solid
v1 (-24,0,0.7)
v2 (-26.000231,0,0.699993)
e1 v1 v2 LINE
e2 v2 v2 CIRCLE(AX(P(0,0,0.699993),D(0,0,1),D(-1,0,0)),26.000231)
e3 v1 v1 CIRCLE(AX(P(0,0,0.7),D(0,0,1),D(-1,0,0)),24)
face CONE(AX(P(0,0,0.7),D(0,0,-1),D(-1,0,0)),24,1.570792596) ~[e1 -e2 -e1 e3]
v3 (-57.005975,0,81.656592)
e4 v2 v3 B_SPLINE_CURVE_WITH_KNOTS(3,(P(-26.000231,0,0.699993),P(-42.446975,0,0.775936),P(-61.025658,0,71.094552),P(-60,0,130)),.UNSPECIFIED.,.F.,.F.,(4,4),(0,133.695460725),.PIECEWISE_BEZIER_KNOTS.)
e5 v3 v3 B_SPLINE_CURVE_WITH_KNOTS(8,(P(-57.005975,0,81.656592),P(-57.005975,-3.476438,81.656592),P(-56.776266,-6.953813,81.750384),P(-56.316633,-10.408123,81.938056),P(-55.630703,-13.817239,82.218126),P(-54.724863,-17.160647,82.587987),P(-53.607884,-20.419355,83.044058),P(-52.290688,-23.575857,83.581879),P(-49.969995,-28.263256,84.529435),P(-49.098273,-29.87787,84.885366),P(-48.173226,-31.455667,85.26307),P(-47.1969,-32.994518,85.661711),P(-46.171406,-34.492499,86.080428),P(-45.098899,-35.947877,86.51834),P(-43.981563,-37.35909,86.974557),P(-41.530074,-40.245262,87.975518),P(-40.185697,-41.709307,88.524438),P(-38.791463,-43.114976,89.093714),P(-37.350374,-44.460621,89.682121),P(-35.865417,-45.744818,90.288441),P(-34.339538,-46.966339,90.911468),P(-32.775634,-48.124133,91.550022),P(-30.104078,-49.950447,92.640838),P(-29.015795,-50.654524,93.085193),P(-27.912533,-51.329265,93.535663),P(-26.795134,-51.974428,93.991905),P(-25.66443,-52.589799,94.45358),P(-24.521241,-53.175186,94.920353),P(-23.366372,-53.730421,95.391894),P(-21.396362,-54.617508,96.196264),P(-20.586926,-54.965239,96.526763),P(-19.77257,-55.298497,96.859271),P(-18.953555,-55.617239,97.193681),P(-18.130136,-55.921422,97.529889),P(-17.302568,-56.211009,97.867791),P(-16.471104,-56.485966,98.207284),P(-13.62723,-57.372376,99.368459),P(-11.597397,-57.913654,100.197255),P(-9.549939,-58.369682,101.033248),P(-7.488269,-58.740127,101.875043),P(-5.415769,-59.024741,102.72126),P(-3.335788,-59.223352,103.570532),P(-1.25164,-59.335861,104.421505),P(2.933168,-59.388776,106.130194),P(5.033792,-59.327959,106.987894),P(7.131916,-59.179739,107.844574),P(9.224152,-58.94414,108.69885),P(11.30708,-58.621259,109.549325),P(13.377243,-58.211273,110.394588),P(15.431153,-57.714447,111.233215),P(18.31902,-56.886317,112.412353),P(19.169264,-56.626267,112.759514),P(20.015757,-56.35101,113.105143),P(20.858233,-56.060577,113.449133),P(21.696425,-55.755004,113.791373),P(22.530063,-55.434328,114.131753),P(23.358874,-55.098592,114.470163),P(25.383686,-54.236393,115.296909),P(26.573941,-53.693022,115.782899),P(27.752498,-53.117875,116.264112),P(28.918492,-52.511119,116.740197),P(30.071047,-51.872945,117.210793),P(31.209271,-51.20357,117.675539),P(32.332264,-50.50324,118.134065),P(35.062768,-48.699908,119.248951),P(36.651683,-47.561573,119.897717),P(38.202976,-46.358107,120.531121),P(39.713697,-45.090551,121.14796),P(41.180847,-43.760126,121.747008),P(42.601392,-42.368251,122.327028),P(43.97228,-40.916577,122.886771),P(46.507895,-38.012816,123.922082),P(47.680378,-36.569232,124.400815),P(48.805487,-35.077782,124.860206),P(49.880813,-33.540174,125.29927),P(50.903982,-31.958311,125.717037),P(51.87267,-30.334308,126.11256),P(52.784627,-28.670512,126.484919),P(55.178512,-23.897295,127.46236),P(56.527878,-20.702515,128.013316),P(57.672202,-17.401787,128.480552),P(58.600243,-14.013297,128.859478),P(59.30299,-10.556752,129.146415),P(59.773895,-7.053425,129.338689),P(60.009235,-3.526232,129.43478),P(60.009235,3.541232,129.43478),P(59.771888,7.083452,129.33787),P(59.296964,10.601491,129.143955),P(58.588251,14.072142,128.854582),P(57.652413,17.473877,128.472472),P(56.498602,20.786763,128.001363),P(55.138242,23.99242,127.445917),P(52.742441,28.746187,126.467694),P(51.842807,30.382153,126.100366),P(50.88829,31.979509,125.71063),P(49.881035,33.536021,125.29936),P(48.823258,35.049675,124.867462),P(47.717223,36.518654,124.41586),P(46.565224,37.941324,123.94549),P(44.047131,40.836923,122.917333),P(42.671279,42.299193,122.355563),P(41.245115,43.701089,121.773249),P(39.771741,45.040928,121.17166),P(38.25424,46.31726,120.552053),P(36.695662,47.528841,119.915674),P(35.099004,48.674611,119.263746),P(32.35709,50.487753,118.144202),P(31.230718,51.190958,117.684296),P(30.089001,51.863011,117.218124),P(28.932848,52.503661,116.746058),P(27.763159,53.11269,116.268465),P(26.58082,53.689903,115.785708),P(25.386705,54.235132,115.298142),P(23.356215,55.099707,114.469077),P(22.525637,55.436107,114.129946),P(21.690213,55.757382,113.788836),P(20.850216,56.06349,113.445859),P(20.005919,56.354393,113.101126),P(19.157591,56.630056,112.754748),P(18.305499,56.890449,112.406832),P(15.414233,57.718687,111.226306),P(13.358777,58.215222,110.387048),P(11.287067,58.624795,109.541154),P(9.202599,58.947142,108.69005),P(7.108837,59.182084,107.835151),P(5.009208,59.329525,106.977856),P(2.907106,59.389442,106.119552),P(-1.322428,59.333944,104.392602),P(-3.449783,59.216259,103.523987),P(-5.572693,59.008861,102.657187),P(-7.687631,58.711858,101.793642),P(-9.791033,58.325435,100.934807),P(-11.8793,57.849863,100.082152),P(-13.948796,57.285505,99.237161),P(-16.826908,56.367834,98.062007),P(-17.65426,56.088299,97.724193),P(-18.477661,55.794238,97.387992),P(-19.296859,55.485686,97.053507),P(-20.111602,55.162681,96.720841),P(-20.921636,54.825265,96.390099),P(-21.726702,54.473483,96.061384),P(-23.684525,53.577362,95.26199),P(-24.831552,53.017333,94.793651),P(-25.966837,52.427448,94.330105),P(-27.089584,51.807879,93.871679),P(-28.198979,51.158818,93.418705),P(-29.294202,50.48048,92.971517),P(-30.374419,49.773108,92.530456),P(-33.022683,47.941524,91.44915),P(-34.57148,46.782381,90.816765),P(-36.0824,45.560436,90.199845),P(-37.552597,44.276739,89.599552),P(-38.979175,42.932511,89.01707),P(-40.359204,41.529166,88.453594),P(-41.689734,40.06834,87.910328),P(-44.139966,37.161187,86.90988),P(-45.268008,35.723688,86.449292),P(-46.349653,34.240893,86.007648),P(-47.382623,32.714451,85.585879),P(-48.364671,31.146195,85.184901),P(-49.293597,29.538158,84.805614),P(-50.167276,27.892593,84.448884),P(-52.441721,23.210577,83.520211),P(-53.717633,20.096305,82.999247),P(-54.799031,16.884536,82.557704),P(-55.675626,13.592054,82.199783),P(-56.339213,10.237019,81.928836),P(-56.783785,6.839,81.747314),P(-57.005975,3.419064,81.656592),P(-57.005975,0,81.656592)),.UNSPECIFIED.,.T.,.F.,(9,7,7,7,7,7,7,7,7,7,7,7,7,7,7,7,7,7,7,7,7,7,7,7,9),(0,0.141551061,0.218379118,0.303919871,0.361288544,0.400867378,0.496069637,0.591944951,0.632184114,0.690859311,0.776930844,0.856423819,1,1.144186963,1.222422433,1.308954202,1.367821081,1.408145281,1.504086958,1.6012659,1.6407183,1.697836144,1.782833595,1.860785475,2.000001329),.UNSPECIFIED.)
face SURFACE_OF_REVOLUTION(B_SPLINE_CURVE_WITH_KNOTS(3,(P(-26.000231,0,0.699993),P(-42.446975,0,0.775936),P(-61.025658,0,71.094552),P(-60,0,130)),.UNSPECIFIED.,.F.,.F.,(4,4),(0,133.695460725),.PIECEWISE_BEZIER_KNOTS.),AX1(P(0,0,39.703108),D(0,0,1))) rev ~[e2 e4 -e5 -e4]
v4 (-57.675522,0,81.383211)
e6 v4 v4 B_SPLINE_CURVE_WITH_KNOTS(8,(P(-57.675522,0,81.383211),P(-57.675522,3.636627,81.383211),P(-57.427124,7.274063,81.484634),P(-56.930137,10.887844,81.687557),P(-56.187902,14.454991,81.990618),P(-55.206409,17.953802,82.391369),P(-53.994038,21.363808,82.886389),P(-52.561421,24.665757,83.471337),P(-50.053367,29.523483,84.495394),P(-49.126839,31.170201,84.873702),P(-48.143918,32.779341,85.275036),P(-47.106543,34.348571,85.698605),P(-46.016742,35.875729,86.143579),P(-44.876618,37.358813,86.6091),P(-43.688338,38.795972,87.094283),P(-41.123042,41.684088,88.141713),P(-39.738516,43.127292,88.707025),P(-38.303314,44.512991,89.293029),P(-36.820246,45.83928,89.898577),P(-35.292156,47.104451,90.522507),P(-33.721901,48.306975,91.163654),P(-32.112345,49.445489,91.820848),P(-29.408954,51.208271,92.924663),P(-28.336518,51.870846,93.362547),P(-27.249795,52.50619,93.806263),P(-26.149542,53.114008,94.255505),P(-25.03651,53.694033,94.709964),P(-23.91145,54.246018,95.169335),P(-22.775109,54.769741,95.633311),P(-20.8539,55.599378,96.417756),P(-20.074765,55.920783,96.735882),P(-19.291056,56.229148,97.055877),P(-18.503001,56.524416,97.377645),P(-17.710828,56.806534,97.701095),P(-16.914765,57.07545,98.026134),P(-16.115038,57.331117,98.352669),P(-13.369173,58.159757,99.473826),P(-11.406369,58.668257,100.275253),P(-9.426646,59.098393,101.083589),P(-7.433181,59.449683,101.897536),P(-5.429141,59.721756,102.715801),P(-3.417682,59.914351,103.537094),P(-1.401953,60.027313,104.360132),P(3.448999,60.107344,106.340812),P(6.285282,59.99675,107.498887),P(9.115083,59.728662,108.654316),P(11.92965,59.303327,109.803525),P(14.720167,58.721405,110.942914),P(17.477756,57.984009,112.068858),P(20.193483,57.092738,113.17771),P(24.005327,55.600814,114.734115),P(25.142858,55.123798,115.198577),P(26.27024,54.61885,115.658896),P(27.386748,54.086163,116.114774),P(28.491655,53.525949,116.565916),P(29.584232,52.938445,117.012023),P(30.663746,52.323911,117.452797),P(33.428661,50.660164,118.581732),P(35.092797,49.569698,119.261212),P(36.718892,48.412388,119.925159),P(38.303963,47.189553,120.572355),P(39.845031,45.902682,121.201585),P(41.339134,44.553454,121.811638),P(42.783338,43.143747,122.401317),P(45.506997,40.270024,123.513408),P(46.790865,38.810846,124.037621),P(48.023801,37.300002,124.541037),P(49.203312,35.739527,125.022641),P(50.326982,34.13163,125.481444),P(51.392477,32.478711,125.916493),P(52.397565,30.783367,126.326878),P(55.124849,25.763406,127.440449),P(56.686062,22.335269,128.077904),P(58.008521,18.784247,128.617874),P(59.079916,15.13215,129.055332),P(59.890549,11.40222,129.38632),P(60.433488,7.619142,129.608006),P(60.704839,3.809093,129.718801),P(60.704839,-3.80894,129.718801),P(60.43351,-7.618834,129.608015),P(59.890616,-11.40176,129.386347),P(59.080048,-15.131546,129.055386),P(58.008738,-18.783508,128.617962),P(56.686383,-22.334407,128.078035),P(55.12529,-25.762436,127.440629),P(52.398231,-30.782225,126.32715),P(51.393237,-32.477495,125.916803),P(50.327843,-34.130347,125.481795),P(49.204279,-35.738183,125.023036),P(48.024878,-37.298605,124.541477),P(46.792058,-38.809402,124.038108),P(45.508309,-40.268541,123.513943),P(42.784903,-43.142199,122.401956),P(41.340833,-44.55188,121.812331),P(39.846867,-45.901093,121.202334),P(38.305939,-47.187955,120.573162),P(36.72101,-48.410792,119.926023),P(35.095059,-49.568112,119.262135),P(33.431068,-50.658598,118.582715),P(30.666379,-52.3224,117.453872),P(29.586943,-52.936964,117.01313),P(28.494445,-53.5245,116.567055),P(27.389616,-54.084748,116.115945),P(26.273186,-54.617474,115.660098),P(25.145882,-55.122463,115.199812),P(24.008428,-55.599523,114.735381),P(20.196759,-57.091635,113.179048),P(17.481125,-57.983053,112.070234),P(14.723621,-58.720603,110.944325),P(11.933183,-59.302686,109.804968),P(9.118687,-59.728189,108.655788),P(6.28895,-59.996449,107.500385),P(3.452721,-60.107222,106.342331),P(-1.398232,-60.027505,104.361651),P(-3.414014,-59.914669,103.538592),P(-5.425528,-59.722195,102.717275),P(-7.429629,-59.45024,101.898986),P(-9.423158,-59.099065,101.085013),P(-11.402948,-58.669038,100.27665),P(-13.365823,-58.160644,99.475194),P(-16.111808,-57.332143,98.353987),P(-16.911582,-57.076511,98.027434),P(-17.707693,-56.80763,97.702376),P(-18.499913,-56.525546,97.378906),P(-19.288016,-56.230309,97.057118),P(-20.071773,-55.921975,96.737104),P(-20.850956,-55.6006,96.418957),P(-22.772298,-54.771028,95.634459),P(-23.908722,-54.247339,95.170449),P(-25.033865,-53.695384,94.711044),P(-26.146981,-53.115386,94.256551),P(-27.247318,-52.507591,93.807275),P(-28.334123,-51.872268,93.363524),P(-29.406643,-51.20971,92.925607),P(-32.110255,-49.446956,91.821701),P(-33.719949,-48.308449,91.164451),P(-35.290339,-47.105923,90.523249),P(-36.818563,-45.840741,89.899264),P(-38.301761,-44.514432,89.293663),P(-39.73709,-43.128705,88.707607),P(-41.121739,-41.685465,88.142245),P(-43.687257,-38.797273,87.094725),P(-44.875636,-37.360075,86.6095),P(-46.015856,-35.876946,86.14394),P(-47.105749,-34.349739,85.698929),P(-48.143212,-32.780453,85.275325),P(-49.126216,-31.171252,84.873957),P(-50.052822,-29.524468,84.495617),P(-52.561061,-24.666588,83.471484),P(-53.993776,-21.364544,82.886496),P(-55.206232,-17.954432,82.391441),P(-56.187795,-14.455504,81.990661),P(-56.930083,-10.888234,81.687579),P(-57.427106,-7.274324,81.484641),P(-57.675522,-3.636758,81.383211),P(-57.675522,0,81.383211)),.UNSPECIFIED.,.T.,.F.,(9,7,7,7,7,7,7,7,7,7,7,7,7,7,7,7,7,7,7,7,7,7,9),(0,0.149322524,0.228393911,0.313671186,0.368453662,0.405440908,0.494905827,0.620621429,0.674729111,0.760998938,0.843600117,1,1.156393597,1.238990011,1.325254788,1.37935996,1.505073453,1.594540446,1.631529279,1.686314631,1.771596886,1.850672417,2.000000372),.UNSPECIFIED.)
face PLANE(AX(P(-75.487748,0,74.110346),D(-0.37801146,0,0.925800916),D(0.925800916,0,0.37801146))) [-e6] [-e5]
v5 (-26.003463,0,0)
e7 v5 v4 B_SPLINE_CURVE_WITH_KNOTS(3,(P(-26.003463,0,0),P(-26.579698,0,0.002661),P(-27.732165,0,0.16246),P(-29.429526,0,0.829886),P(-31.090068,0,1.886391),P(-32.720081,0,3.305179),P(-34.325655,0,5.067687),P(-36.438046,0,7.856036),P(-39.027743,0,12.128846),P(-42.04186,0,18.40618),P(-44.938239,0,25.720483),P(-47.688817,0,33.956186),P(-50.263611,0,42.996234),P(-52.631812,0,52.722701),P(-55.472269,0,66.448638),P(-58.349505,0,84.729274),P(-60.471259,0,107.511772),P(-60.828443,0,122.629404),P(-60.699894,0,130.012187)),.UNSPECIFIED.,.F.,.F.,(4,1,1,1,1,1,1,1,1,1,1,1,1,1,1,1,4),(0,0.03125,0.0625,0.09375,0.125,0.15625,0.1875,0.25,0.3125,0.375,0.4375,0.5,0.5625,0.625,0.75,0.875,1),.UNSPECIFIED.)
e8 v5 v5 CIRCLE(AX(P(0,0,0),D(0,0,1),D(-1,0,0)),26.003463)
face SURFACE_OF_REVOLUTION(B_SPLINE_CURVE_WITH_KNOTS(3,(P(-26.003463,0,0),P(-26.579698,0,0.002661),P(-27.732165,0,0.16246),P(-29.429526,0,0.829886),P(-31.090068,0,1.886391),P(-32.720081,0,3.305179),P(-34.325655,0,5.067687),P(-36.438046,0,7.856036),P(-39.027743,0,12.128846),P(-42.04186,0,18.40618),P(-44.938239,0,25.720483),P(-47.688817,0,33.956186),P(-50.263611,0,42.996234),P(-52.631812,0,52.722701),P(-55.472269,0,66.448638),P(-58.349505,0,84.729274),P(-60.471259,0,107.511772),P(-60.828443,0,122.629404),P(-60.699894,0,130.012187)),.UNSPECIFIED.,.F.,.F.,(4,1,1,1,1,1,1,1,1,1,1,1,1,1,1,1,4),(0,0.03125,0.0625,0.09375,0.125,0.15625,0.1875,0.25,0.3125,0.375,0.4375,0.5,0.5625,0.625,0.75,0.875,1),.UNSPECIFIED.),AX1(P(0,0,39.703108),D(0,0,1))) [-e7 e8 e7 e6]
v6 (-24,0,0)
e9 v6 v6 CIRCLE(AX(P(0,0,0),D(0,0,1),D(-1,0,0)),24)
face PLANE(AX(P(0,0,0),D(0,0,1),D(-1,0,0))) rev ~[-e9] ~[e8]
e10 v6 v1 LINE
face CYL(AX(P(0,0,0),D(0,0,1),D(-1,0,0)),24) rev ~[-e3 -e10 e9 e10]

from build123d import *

# Parameters (mm, degrees)
F3_DEPTH      = 87.2
F3_DEPTH_BACK = 108.3


# Not quite as in the source:
# - the dataset's text gives a spline's control points without its knots; the knots are read off the source's solid


with BuildPart() as f1:
    # F0 (on Front) → F1 (revolve)
    with BuildSketch(Plane.XZ):
        with BuildLine():
            Line((-26, 0), (-24, 0))
            Line((-24, 0), (-24, 0.7))
            Line((-24, 0.7), (-26.000231048, 0.6999925375))
            add(Edge.make_bspline(
                [(-26.000231048, 0.6999925375), (-42.4469747777, 0.7759363516), (-61.0256584264, 71.094551837), (-60, 130)],
                knots=[0, 0, 0, 0, 133.6954607255, 133.6954607255, 133.6954607255, 133.6954607255], degree=3))
            Line((-60, 130), (-60.6998939126, 130.0121865143))
            add(Edge.make_bspline(
                [(-26.0034633051, 0), (-26.5796975271, 0.0026607957), (-27.7321648969, 0.1624599653), (-29.4295260176, 0.8298855591), (-31.0900677324, 1.8863905392), (-32.7200814566, 3.3051792178), (-34.3256546626, 5.0676867813), (-36.4380461904, 7.8560362741), (-39.0277431424, 12.1288455713), (-42.0418595357, 18.4061797237), (-44.9382391494, 25.72048285), (-47.6888169613, 33.9561861991), (-50.2636113567, 42.996233753), (-52.631812031, 52.7227009583), (-55.4722689862, 66.4486378575), (-58.3495045205, 84.7292737665), (-60.4712587342, 107.5117720052), (-60.8284425216, 122.6294036772), (-60.6998939126, 130.0121865143)],
                knots=[0, 0, 0, 0, 0.03125, 0.0625, 0.09375, 0.125, 0.15625, 0.1875, 0.25, 0.3125, 0.375, 0.4375, 0.5, 0.5625, 0.625, 0.75, 0.875, 1, 1, 1, 1], degree=3))
            Line((-26.0034633051, 0), (-26, 0))
        make_face()
    revolve(axis=Axis((0, 0, 39.7031084829), (0, 0, 1)))

    # F2 (on Front) → F3 (cut, two sides)
    with BuildSketch(Plane.XZ) as f3_sk:
        Polygon((-75.4877477884, 74.1103456458), (66.8336823583, 132.2212533196), (66.8336823583, 154.84363), (-75.4877477884, 154.84363), align=None)
    extrude(amount=-F3_DEPTH, mode=Mode.SUBTRACT)
    extrude(f3_sk.sketch, amount=F3_DEPTH_BACK, mode=Mode.SUBTRACT)


solid = f1.part
